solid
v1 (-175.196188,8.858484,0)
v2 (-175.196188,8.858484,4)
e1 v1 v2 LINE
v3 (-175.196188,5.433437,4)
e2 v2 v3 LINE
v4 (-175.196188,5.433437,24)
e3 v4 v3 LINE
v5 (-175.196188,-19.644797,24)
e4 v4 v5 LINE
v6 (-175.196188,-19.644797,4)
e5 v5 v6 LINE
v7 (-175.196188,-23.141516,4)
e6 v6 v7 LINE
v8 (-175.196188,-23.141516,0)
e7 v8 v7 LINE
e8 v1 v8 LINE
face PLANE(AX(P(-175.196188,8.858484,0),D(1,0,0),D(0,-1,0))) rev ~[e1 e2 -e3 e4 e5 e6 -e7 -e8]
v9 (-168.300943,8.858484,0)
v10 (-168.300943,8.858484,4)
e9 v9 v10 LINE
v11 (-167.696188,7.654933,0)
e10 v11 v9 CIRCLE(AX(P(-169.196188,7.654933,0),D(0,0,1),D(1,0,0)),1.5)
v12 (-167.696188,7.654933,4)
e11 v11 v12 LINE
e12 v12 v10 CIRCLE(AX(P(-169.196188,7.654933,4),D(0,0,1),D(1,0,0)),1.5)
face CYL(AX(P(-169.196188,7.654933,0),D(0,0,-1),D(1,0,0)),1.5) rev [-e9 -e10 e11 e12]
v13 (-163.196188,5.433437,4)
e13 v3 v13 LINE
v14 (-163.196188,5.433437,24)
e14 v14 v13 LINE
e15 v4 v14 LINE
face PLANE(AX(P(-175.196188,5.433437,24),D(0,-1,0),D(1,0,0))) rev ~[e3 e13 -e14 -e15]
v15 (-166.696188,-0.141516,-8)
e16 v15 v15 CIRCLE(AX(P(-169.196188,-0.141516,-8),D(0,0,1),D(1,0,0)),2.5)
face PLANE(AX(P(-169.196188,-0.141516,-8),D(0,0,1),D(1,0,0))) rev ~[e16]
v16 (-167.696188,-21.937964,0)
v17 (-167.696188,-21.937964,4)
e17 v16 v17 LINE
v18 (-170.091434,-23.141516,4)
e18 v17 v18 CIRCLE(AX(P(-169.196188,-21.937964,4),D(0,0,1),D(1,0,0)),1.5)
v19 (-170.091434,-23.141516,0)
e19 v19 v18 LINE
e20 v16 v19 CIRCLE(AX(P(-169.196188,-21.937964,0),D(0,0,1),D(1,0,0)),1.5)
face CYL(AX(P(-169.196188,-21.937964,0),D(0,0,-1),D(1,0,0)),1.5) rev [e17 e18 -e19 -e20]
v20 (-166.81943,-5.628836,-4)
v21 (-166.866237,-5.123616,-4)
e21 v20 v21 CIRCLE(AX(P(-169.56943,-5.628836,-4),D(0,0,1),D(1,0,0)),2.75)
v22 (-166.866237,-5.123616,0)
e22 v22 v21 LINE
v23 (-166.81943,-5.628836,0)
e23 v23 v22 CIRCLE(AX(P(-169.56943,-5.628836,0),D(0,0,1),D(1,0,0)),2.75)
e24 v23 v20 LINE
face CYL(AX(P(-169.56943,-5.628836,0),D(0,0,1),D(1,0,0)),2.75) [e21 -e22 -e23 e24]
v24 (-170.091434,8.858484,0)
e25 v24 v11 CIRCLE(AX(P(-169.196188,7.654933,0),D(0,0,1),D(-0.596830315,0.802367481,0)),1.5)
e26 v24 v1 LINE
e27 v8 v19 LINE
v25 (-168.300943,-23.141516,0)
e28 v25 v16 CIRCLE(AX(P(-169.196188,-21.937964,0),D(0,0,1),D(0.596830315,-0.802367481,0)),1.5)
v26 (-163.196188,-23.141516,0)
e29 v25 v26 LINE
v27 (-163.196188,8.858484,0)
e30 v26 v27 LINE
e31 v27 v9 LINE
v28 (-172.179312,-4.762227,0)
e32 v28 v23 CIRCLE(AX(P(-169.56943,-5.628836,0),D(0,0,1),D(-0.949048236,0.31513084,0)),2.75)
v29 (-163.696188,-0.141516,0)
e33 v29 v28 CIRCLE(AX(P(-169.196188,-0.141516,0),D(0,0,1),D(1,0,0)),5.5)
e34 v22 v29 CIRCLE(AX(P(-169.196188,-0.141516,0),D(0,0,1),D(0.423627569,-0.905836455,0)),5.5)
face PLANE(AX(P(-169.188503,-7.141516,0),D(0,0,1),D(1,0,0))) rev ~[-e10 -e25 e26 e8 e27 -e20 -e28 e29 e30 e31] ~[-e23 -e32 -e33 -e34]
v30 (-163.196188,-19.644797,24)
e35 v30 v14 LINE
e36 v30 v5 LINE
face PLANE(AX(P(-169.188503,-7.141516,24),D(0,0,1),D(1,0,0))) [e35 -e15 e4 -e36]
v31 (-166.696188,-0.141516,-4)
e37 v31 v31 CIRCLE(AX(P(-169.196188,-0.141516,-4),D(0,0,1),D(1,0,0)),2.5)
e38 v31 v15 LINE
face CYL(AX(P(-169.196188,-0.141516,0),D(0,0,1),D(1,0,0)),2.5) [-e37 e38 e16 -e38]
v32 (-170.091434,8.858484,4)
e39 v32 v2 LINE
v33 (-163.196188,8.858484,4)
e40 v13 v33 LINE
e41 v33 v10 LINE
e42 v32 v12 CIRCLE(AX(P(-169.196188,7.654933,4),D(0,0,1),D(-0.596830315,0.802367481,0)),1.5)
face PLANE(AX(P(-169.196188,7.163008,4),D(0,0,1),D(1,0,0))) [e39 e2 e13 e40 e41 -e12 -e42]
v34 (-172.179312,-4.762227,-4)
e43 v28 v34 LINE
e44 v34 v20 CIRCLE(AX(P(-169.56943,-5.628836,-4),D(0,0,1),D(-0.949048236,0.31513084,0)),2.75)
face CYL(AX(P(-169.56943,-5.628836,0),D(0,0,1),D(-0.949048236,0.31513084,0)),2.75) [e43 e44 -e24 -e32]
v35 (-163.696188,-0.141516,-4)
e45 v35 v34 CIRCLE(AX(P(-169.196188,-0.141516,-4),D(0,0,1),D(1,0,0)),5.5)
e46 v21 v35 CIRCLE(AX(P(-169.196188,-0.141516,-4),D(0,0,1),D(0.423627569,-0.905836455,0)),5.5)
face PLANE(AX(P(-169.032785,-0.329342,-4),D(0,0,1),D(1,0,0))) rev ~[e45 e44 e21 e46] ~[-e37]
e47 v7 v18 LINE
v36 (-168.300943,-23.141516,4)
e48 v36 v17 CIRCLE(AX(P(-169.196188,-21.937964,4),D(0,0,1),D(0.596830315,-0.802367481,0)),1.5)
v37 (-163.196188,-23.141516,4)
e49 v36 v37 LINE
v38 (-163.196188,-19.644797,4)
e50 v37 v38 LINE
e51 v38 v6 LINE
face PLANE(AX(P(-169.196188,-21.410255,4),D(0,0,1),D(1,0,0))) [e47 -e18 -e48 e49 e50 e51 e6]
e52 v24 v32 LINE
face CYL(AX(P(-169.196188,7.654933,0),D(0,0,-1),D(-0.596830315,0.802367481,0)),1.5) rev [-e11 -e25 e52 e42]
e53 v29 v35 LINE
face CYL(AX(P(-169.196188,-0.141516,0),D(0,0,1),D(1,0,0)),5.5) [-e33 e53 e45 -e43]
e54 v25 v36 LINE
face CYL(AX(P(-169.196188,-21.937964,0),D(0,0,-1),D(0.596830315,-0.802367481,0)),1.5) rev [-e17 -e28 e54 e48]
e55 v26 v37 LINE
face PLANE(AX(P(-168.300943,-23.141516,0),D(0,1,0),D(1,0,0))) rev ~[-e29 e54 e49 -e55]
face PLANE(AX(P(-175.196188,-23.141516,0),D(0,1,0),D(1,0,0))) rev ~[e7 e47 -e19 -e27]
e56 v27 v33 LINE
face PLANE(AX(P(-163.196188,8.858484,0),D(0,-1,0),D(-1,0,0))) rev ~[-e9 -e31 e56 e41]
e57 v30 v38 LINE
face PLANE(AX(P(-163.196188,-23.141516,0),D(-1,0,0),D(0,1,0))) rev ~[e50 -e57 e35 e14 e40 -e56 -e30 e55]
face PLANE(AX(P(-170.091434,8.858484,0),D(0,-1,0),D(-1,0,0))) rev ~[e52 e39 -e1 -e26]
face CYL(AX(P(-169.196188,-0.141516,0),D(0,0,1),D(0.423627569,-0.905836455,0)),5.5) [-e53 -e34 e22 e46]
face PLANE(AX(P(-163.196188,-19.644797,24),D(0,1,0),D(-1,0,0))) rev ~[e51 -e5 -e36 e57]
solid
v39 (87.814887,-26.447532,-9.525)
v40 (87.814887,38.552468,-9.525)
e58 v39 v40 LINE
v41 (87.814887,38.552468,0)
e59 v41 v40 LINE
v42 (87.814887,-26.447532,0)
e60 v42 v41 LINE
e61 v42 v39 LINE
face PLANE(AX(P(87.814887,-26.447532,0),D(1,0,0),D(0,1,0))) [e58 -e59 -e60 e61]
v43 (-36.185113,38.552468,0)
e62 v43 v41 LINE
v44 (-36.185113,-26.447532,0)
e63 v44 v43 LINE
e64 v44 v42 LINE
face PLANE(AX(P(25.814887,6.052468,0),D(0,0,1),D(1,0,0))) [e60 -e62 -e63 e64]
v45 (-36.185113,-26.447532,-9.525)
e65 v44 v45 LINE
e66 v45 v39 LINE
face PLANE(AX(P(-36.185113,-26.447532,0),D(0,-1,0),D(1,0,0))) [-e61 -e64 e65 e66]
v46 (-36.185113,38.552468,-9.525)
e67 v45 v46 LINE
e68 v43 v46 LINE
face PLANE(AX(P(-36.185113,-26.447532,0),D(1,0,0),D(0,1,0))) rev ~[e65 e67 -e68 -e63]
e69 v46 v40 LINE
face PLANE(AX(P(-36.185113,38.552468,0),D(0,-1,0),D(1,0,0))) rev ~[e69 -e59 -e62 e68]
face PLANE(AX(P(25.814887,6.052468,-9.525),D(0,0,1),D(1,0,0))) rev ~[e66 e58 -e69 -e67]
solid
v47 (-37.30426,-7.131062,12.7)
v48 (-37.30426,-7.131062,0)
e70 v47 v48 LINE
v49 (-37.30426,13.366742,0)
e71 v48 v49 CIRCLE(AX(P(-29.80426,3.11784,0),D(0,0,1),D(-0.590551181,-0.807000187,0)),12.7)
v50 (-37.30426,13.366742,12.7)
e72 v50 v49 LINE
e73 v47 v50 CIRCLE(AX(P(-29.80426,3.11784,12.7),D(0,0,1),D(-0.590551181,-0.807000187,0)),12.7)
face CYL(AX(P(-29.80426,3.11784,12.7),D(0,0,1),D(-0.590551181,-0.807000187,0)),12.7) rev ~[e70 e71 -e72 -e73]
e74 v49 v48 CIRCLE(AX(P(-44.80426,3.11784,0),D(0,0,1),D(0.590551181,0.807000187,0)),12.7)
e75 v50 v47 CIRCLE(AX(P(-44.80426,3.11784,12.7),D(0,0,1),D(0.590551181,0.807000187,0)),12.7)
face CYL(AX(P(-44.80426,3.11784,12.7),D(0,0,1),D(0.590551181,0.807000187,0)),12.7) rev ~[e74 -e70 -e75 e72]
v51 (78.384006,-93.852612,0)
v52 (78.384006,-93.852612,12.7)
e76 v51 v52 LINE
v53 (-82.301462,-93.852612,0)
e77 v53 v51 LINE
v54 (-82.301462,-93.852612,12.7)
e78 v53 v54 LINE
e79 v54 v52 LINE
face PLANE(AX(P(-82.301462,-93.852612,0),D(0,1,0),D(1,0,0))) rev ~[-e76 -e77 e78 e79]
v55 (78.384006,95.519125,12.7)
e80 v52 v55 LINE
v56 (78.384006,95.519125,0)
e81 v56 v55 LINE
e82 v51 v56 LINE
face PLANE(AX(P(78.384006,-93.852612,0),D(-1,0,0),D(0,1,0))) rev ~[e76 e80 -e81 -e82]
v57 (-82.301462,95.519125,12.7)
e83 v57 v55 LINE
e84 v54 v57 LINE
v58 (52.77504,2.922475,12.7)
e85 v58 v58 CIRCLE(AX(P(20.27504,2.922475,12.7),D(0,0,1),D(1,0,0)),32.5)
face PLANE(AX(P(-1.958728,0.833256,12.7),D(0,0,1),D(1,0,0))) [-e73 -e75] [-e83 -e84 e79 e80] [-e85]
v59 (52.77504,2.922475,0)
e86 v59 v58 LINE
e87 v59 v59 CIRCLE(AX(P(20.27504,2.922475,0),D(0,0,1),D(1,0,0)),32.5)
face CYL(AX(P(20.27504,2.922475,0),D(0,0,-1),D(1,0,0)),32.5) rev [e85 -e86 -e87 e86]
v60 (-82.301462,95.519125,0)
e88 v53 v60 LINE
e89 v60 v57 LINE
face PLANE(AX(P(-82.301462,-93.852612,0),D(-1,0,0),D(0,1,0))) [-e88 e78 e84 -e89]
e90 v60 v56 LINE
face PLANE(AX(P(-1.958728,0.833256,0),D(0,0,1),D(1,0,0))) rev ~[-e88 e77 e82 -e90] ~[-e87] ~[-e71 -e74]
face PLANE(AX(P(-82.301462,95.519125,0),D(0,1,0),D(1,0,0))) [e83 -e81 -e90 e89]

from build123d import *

# Parameters (mm, degrees)
F0_W      = 160.6854679329
F0_H      = 189.3717367202
F0_R      = 32.5
F1_DEPTH  = 12.7
F2_W      = 124
F2_H      = 65
F3_DEPTH  = 9.525
F5_DEPTH  = 12.7
F6_R      = 2.5
F7_DEPTH  = 24
F8_DEPTH  = 4
F9_DEPTH  = 8
F11_DEPTH = 20
F12_DEPTH = 4


# Not quite as in the source:
# - a length typed as a fraction of an inch, garbled in the dataset ("3 / 203.2 mm" for 3/8 in), is restored


with BuildPart() as f1:
    # F0 (on Top) → F1 (new body)
    with BuildSketch(Plane.XY):
        with Locations((-1.9587278366, 0.8332561702)):
            Rectangle(F0_W, F0_H)
        with Locations((20.2750398644, 2.9224749887)):
            Circle(F0_R, mode=Mode.SUBTRACT)
    extrude(amount=F1_DEPTH)

    # F4 (on face) → F5 (cut, through all)
    with BuildSketch(Plane.XY.offset(12.7)):
        with BuildLine():
            ThreePointArc((-37.3042601347, -7.1310623929), (-24.0579569753, -8.2077946527), (-17.1042601347, 3.1178399874))
            ThreePointArc((-17.1042601347, 3.1178399874), (-24.0579569753, 14.4434746274), (-37.3042601347, 13.3667423676))
            ThreePointArc((-37.3042601347, 13.3667423676), (-33.4786254946, 8.8641431468), (-32.1042601347, 3.1178399874))
            ThreePointArc((-32.1042601347, 3.1178399874), (-33.4786254946, -2.628463172), (-37.3042601347, -7.1310623929))
        make_face()
        with BuildLine():
            ThreePointArc((-32.1042601347, 3.1178399874), (-33.4786254946, 8.8641431468), (-37.3042601347, 13.3667423676))
            ThreePointArc((-37.3042601347, 13.3667423676), (-42.5042601347, 3.1178399874), (-37.3042601347, -7.1310623929))
            ThreePointArc((-37.3042601347, -7.1310623929), (-33.4786254946, -2.628463172), (-32.1042601347, 3.1178399874))
        make_face()
        with BuildLine():
            ThreePointArc((-37.3042601347, -7.1310623929), (-42.5042601347, 3.1178399874), (-37.3042601347, 13.3667423676))
            ThreePointArc((-37.3042601347, 13.3667423676), (-57.5042601347, 3.1178399874), (-37.3042601347, -7.1310623929))
        make_face()
    extrude(amount=-F5_DEPTH, mode=Mode.SUBTRACT)


with BuildPart() as f3:
    # F2 (on Top) → F3 (new body)
    with BuildSketch(Plane.XY):
        with Locations((25.8148865969, 6.0524680488)):
            Rectangle(F2_W, F2_H)
    extrude(amount=-F3_DEPTH)


with BuildPart() as f7:
    # F6 (on Top) → F7 (new body)
    with BuildSketch(Plane.XY):
        with BuildLine():
            Line((-170.091433923, 8.8584844804), (-175.1961884499, 8.8584844804))
            Line((-175.1961884499, 8.8584844804), (-175.1961884499, -23.1415155196))
            Line((-175.1961884499, -23.1415155196), (-170.091433923, -23.1415155196))
            ThreePointArc((-170.091433923, -23.1415155196), (-169.8696614598, -20.5976531011), (-167.6961884499, -21.9379642981))
            ThreePointArc((-167.6961884499, -21.9379642981), (-167.8558772528, -22.611437308), (-168.3009429767, -23.1415155196))
            Line((-168.3009429767, -23.1415155196), (-163.1961884499, -23.1415155196))
            Line((-163.1961884499, -23.1415155196), (-163.1961884499, 8.8584844804))
            Line((-163.1961884499, 8.8584844804), (-168.3009429767, 8.8584844804))
            ThreePointArc((-168.3009429767, 8.8584844804), (-167.8558772528, 8.3284062688), (-167.6961884499, 7.6549332589))
            ThreePointArc((-167.6961884499, 7.6549332589), (-169.8696614598, 6.3146220619), (-170.091433923, 8.8584844804))
        make_face()
        with BuildLine():
            ThreePointArc((-172.1793124567, -4.7622266293), (-171.827045531, 4.6884524947), (-163.6961884499, -0.1415155196))
            ThreePointArc((-163.6961884499, -0.1415155196), (-164.5558902937, -3.0940793244), (-166.8662368213, -5.1236160213))
            ThreePointArc((-166.8662368213, -5.1236160213), (-166.8311565651, -5.3751444183), (-166.8194298089, -5.6288364404))
            ThreePointArc((-166.8194298089, -5.6288364404), (-170.0083618757, -8.3435811136), (-172.1793124567, -4.7622266293))
        make_face(mode=Mode.SUBTRACT)
        with BuildLine():
            ThreePointArc((-168.3009429767, 8.8584844804), (-169.1961884499, 9.1549332589), (-170.091433923, 8.8584844804))
            Line((-170.091433923, 8.8584844804), (-168.3009429767, 8.8584844804))
        make_face()
        with BuildLine():
            Line((-168.3009429767, 8.8584844804), (-170.091433923, 8.8584844804))
            ThreePointArc((-170.091433923, 8.8584844804), (-169.8696614598, 6.3146220619), (-167.6961884499, 7.6549332589))
            ThreePointArc((-167.6961884499, 7.6549332589), (-167.8558772528, 8.3284062688), (-168.3009429767, 8.8584844804))
        make_face()
        with BuildLine():
            ThreePointArc((-167.6961884499, -21.9379642981), (-169.8696614598, -20.5976531011), (-170.091433923, -23.1415155196))
            Line((-170.091433923, -23.1415155196), (-168.3009429767, -23.1415155196))
            ThreePointArc((-168.3009429767, -23.1415155196), (-167.8558772528, -22.611437308), (-167.6961884499, -21.9379642981))
        make_face()
        with BuildLine():
            Line((-168.3009429767, -23.1415155196), (-170.091433923, -23.1415155196))
            ThreePointArc((-170.091433923, -23.1415155196), (-169.1961884499, -23.4379642981), (-168.3009429767, -23.1415155196))
        make_face()
        with BuildLine():
            ThreePointArc((-166.8662368213, -5.1236160213), (-164.5558902937, -3.0940793244), (-163.6961884499, -0.1415155196))
            ThreePointArc((-163.6961884499, -0.1415155196), (-171.827045531, 4.6884524947), (-172.1793124567, -4.7622266293))
            ThreePointArc((-172.1793124567, -4.7622266293), (-169.3828091294, -2.88517598), (-166.8662368213, -5.1236160213))
        make_face()
        with Locations((-169.1961884499, -0.1415155196)):
            Circle(F6_R, mode=Mode.SUBTRACT)
        with Locations((-169.1961884499, -0.1415155196)):
            Circle(F6_R)
        with BuildLine():
            ThreePointArc((-166.8662368213, -5.1236160213), (-169.5694298089, -5.6288364404), (-172.1793124567, -4.7622266293))
            ThreePointArc((-172.1793124567, -4.7622266293), (-170.0083618757, -8.3435811136), (-166.8194298089, -5.6288364404))
            ThreePointArc((-166.8194298089, -5.6288364404), (-166.8311565651, -5.3751444183), (-166.8662368213, -5.1236160213))
        make_face()
        with BuildLine():
            ThreePointArc((-166.8662368213, -5.1236160213), (-169.3828091294, -2.88517598), (-172.1793124567, -4.7622266293))
            ThreePointArc((-172.1793124567, -4.7622266293), (-169.5694298089, -5.6288364404), (-166.8662368213, -5.1236160213))
        make_face()
    extrude(amount=F7_DEPTH)

    # F6 (on Top) → F8 (join)
    with BuildSketch(Plane.XY):
        with BuildLine():
            ThreePointArc((-166.8662368213, -5.1236160213), (-164.5558902937, -3.0940793244), (-163.6961884499, -0.1415155196))
            ThreePointArc((-163.6961884499, -0.1415155196), (-171.827045531, 4.6884524947), (-172.1793124567, -4.7622266293))
            ThreePointArc((-172.1793124567, -4.7622266293), (-169.3828091294, -2.88517598), (-166.8662368213, -5.1236160213))
        make_face()
        with Locations((-169.1961884499, -0.1415155196)):
            Circle(F6_R, mode=Mode.SUBTRACT)
        with BuildLine():
            ThreePointArc((-166.8662368213, -5.1236160213), (-169.5694298089, -5.6288364404), (-172.1793124567, -4.7622266293))
            ThreePointArc((-172.1793124567, -4.7622266293), (-170.0083618757, -8.3435811136), (-166.8194298089, -5.6288364404))
            ThreePointArc((-166.8194298089, -5.6288364404), (-166.8311565651, -5.3751444183), (-166.8662368213, -5.1236160213))
        make_face()
        with BuildLine():
            ThreePointArc((-166.8662368213, -5.1236160213), (-169.3828091294, -2.88517598), (-172.1793124567, -4.7622266293))
            ThreePointArc((-172.1793124567, -4.7622266293), (-169.5694298089, -5.6288364404), (-166.8662368213, -5.1236160213))
        make_face()
    extrude(amount=-F8_DEPTH)

    # F6 (on Top) → F9 (join)
    with BuildSketch(Plane.XY):
        with Locations((-169.1961884499, -0.1415155196)):
            Circle(F6_R)
    extrude(amount=-F9_DEPTH)

    # F10 (on face) → F11 (cut)
    with BuildSketch(Plane.XY.offset(24)):
        with BuildLine():
            Line((-175.1961884499, 5.4334374145), (-163.1961884499, 5.4334374145))
            Line((-163.1961884499, 5.4334374145), (-163.1961884499, 8.8584844804))
            Line((-163.1961884499, 8.8584844804), (-168.3009429767, 8.8584844804))
            ThreePointArc((-168.3009429767, 8.8584844804), (-169.1961884499, 9.1549332589), (-170.091433923, 8.8584844804))
            Line((-170.091433923, 8.8584844804), (-175.1961884499, 8.8584844804))
            Line((-175.1961884499, 8.8584844804), (-175.1961884499, 5.4334374145))
        make_face()
        with BuildLine():
            Line((-163.1961884499, -23.1415155196), (-163.1961884499, -19.6447968483))
            Line((-163.1961884499, -19.6447968483), (-175.1961884499, -19.6447968483))
            Line((-175.1961884499, -19.6447968483), (-175.1961884499, -23.1415155196))
            Line((-175.1961884499, -23.1415155196), (-170.091433923, -23.1415155196))
            ThreePointArc((-170.091433923, -23.1415155196), (-169.1961884499, -23.4379642981), (-168.3009429767, -23.1415155196))
            Line((-168.3009429767, -23.1415155196), (-163.1961884499, -23.1415155196))
        make_face()
    extrude(amount=-F11_DEPTH, mode=Mode.SUBTRACT)

    # F6 (on Top) → F12 (cut, through all)
    with BuildSketch(Plane.XY):
        with BuildLine():
            Line((-168.3009429767, 8.8584844804), (-170.091433923, 8.8584844804))
            ThreePointArc((-170.091433923, 8.8584844804), (-169.8696614598, 6.3146220619), (-167.6961884499, 7.6549332589))
            ThreePointArc((-167.6961884499, 7.6549332589), (-167.8558772528, 8.3284062688), (-168.3009429767, 8.8584844804))
        make_face()
        with BuildLine():
            ThreePointArc((-167.6961884499, -21.9379642981), (-169.8696614598, -20.5976531011), (-170.091433923, -23.1415155196))
            Line((-170.091433923, -23.1415155196), (-168.3009429767, -23.1415155196))
            ThreePointArc((-168.3009429767, -23.1415155196), (-167.8558772528, -22.611437308), (-167.6961884499, -21.9379642981))
        make_face()
        with BuildLine():
            Line((-168.3009429767, -23.1415155196), (-170.091433923, -23.1415155196))
            ThreePointArc((-170.091433923, -23.1415155196), (-169.1961884499, -23.4379642981), (-168.3009429767, -23.1415155196))
        make_face()
        with BuildLine():
            ThreePointArc((-168.3009429767, 8.8584844804), (-169.1961884499, 9.1549332589), (-170.091433923, 8.8584844804))
            Line((-170.091433923, 8.8584844804), (-168.3009429767, 8.8584844804))
        make_face()
    extrude(amount=F12_DEPTH, mode=Mode.SUBTRACT)


solid = Compound([f1.part, f3.part, f7.part])
